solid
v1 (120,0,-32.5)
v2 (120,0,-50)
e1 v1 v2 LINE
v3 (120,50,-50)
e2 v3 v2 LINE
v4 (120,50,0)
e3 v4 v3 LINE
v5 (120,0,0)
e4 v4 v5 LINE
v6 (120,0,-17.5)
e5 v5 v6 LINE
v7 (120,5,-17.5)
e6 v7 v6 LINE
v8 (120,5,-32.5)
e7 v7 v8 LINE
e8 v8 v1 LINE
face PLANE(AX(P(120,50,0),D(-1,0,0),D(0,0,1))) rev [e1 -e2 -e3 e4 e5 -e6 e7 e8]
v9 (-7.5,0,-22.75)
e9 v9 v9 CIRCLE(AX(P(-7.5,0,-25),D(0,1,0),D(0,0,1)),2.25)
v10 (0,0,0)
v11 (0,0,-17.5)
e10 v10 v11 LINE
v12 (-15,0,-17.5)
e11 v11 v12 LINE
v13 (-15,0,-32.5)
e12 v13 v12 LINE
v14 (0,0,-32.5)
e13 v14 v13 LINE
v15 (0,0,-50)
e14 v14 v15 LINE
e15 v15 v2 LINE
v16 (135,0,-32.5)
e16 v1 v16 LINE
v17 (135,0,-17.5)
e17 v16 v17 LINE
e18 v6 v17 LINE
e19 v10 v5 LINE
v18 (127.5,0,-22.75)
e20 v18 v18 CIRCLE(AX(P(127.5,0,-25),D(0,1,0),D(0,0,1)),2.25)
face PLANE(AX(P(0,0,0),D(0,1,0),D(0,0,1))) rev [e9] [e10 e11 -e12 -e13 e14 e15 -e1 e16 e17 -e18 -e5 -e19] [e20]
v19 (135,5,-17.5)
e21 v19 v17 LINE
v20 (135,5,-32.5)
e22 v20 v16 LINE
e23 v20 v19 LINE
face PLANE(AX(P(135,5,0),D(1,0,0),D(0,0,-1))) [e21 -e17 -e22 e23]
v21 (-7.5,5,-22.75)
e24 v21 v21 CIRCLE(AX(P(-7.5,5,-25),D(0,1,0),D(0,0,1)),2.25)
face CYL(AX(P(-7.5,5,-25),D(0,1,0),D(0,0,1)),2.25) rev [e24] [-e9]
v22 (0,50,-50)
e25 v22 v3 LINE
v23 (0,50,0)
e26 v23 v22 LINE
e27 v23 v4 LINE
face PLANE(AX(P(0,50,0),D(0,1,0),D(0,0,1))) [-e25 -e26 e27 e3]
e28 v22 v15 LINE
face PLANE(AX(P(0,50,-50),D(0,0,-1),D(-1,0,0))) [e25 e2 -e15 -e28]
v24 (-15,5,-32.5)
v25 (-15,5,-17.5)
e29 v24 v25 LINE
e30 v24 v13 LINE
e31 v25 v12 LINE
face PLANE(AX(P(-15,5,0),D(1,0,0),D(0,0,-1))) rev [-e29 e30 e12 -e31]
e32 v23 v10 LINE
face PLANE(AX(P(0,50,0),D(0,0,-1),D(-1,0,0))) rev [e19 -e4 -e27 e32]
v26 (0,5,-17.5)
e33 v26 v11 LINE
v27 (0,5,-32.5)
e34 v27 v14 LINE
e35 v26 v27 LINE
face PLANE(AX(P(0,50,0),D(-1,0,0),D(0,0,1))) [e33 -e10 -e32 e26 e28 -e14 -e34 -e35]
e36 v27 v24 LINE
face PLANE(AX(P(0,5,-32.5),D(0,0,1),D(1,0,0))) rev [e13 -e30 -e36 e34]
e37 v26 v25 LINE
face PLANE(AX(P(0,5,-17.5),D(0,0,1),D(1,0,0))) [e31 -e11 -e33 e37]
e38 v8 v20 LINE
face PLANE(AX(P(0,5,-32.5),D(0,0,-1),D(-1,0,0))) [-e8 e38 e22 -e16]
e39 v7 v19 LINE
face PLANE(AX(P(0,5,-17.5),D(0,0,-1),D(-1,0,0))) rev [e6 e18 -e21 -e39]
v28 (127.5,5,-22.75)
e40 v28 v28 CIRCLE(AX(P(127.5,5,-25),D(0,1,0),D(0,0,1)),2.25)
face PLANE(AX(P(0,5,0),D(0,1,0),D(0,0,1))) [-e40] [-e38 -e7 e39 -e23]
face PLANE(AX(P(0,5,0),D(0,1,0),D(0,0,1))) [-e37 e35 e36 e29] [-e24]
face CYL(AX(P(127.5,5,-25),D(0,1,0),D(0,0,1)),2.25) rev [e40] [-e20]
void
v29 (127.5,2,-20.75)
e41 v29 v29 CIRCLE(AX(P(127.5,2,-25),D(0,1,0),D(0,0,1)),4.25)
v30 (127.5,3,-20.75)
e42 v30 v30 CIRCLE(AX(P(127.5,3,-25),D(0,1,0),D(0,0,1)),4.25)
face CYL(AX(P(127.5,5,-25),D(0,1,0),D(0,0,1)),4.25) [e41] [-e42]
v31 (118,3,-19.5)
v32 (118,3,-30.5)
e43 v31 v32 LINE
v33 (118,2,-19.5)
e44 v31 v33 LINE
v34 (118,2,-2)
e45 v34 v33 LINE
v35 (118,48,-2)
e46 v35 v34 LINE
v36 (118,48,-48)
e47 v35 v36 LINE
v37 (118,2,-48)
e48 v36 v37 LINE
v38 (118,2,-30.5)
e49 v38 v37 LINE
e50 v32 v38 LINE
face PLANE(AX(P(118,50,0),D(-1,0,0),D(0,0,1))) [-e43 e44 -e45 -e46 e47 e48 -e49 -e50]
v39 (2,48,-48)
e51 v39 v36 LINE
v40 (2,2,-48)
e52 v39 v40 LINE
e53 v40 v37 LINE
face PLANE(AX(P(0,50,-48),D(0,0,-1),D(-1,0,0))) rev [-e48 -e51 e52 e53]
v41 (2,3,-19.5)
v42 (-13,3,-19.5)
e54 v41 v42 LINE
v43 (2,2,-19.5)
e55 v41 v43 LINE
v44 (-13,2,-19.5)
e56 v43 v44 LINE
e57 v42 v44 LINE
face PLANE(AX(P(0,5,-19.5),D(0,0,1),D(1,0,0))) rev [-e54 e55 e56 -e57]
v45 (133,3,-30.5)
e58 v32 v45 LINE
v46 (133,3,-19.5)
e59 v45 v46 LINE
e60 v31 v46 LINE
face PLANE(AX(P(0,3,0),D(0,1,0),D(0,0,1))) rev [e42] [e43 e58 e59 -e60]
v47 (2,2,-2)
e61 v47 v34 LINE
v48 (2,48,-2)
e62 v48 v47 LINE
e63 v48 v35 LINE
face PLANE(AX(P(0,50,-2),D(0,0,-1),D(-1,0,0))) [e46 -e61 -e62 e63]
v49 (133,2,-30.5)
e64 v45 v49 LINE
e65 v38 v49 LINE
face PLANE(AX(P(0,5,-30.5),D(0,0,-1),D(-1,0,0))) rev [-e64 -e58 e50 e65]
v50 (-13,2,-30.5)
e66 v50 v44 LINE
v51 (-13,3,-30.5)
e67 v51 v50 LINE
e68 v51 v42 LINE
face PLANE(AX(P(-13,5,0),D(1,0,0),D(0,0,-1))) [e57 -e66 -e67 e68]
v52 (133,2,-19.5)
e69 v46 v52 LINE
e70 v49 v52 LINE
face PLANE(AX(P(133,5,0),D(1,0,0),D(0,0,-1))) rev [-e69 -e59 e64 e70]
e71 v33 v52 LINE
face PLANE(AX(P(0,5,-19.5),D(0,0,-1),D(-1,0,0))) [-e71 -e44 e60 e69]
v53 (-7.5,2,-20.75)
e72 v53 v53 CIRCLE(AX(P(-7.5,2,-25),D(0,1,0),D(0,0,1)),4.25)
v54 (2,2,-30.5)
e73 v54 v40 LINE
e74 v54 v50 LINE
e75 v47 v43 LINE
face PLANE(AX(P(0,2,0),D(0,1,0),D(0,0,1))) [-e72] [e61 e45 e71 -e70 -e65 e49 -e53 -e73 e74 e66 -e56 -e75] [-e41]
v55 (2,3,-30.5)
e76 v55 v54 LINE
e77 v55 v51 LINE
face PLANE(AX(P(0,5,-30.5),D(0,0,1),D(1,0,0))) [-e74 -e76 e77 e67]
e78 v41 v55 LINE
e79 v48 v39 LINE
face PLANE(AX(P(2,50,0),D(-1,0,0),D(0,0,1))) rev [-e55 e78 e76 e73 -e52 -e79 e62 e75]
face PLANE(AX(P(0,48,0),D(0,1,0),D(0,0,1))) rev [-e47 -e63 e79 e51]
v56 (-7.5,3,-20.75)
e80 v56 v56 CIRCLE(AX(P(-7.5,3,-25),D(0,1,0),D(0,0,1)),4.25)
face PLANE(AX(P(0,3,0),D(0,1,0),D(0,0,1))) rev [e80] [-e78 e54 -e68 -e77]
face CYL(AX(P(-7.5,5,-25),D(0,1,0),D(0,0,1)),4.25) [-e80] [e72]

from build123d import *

# Parameters (mm, degrees)
BOSS_EXTRU_2_DEPTH   = 50
R_SERVOIR_TEST_3_W   = 15
R_SERVOIR_TEST_3_H   = 15
BOSS_EXTRU_3_DEPTH   = 5
D_GAGEMENT_M41_D     = 4.5
D_GAGEMENT_M41_DEPTH = 5
D_GAGEMENT_M41_TIP   = 1.351936393
COQUE3_START         = 2
COQUE3_OUTLINE_W     = 116
COQUE3_OUTLINE_H     = 46
COQUE3_DEPTH         = 46
COQUE3_2_OUTLINE_W   = 15
COQUE3_2_OUTLINE_H   = 11
COQUE3_2_OUTLINE_R   = 4.25
COQUE3_2_DEPTH       = 1


# Read off the part's stored shape, not the designer's step: Coque3
with BuildPart() as part:
    # Réservoir test → Boss.-Extru.2 (new body)
    with BuildSketch(Plane(origin=(0, 0, 0), x_dir=(1, 0, 0), z_dir=(0, 1, 0))):
        Polygon((60, 0), (60, 50), (0, 50), (0, 32.5), (0, 17.5), (0, 0), align=None)
        Polygon((120, 50), (60, 50), (60, 0), (120, 0), (120, 17.5), (120, 32.5), align=None)
    extrude(amount=BOSS_EXTRU_2_DEPTH)

    # Réservoir test<3> → Boss.-Extru.3 (add)
    with BuildSketch(Plane(origin=(0, 0, 0), x_dir=(1, 0, 0), z_dir=(0, 1, 0))):
        with Locations((-7.5, 25)):
            Rectangle(R_SERVOIR_TEST_3_W, R_SERVOIR_TEST_3_H)
        with Locations((127.5, 25)):
            Rectangle(R_SERVOIR_TEST_3_W, R_SERVOIR_TEST_3_H)
    extrude(amount=BOSS_EXTRU_3_DEPTH)

    # Dégagement M41
    with Locations(Plane(origin=(0, 5, 0), x_dir=(1, 0, 0), z_dir=(0, 1, 0))):
        with Locations((-7.5, 25), (127.5, 25)):
            Hole(D_GAGEMENT_M41_D / 2, depth=D_GAGEMENT_M41_DEPTH)
            with Locations((0, 0, -(D_GAGEMENT_M41_DEPTH + D_GAGEMENT_M41_TIP / 2))):  # 118° drill point
                Cone(0, D_GAGEMENT_M41_D / 2, D_GAGEMENT_M41_TIP, mode=Mode.SUBTRACT)

    # Coque3 outline → Coque3 (cut)
    with BuildSketch(Plane(origin=(0, 0, 0), x_dir=(1, 0, 0), z_dir=(0, 1, 0)).offset(COQUE3_START)):
        with Locations((60, 25)):
            Rectangle(COQUE3_OUTLINE_W, COQUE3_OUTLINE_H)
    extrude(amount=COQUE3_DEPTH, mode=Mode.SUBTRACT)

    # Coque3 2 outline → Coque3 2 (cut)
    # profile 1 of 2: a face of its own
    with BuildSketch(Plane(origin=(0, 0, 0), x_dir=(1, 0, 0), z_dir=(0, 1, 0)).offset(COQUE3_START)):
        with Locations((125.5, 25)):
            Rectangle(COQUE3_2_OUTLINE_W, COQUE3_2_OUTLINE_H)
        with Locations((127.5, 25)):
            Circle(COQUE3_2_OUTLINE_R, mode=Mode.SUBTRACT)
    # profile 2 of 2: a face of its own
    with BuildSketch(Plane(origin=(0, 0, 0), x_dir=(1, 0, 0), z_dir=(0, 1, 0)).offset(COQUE3_START)):
        with Locations((-5.5, 25)):
            Rectangle(COQUE3_2_OUTLINE_W, COQUE3_2_OUTLINE_H)
        with Locations((-7.5, 25)):
            Circle(COQUE3_2_OUTLINE_R, mode=Mode.SUBTRACT)
    extrude(amount=COQUE3_2_DEPTH, mode=Mode.SUBTRACT)


solid = part.part
